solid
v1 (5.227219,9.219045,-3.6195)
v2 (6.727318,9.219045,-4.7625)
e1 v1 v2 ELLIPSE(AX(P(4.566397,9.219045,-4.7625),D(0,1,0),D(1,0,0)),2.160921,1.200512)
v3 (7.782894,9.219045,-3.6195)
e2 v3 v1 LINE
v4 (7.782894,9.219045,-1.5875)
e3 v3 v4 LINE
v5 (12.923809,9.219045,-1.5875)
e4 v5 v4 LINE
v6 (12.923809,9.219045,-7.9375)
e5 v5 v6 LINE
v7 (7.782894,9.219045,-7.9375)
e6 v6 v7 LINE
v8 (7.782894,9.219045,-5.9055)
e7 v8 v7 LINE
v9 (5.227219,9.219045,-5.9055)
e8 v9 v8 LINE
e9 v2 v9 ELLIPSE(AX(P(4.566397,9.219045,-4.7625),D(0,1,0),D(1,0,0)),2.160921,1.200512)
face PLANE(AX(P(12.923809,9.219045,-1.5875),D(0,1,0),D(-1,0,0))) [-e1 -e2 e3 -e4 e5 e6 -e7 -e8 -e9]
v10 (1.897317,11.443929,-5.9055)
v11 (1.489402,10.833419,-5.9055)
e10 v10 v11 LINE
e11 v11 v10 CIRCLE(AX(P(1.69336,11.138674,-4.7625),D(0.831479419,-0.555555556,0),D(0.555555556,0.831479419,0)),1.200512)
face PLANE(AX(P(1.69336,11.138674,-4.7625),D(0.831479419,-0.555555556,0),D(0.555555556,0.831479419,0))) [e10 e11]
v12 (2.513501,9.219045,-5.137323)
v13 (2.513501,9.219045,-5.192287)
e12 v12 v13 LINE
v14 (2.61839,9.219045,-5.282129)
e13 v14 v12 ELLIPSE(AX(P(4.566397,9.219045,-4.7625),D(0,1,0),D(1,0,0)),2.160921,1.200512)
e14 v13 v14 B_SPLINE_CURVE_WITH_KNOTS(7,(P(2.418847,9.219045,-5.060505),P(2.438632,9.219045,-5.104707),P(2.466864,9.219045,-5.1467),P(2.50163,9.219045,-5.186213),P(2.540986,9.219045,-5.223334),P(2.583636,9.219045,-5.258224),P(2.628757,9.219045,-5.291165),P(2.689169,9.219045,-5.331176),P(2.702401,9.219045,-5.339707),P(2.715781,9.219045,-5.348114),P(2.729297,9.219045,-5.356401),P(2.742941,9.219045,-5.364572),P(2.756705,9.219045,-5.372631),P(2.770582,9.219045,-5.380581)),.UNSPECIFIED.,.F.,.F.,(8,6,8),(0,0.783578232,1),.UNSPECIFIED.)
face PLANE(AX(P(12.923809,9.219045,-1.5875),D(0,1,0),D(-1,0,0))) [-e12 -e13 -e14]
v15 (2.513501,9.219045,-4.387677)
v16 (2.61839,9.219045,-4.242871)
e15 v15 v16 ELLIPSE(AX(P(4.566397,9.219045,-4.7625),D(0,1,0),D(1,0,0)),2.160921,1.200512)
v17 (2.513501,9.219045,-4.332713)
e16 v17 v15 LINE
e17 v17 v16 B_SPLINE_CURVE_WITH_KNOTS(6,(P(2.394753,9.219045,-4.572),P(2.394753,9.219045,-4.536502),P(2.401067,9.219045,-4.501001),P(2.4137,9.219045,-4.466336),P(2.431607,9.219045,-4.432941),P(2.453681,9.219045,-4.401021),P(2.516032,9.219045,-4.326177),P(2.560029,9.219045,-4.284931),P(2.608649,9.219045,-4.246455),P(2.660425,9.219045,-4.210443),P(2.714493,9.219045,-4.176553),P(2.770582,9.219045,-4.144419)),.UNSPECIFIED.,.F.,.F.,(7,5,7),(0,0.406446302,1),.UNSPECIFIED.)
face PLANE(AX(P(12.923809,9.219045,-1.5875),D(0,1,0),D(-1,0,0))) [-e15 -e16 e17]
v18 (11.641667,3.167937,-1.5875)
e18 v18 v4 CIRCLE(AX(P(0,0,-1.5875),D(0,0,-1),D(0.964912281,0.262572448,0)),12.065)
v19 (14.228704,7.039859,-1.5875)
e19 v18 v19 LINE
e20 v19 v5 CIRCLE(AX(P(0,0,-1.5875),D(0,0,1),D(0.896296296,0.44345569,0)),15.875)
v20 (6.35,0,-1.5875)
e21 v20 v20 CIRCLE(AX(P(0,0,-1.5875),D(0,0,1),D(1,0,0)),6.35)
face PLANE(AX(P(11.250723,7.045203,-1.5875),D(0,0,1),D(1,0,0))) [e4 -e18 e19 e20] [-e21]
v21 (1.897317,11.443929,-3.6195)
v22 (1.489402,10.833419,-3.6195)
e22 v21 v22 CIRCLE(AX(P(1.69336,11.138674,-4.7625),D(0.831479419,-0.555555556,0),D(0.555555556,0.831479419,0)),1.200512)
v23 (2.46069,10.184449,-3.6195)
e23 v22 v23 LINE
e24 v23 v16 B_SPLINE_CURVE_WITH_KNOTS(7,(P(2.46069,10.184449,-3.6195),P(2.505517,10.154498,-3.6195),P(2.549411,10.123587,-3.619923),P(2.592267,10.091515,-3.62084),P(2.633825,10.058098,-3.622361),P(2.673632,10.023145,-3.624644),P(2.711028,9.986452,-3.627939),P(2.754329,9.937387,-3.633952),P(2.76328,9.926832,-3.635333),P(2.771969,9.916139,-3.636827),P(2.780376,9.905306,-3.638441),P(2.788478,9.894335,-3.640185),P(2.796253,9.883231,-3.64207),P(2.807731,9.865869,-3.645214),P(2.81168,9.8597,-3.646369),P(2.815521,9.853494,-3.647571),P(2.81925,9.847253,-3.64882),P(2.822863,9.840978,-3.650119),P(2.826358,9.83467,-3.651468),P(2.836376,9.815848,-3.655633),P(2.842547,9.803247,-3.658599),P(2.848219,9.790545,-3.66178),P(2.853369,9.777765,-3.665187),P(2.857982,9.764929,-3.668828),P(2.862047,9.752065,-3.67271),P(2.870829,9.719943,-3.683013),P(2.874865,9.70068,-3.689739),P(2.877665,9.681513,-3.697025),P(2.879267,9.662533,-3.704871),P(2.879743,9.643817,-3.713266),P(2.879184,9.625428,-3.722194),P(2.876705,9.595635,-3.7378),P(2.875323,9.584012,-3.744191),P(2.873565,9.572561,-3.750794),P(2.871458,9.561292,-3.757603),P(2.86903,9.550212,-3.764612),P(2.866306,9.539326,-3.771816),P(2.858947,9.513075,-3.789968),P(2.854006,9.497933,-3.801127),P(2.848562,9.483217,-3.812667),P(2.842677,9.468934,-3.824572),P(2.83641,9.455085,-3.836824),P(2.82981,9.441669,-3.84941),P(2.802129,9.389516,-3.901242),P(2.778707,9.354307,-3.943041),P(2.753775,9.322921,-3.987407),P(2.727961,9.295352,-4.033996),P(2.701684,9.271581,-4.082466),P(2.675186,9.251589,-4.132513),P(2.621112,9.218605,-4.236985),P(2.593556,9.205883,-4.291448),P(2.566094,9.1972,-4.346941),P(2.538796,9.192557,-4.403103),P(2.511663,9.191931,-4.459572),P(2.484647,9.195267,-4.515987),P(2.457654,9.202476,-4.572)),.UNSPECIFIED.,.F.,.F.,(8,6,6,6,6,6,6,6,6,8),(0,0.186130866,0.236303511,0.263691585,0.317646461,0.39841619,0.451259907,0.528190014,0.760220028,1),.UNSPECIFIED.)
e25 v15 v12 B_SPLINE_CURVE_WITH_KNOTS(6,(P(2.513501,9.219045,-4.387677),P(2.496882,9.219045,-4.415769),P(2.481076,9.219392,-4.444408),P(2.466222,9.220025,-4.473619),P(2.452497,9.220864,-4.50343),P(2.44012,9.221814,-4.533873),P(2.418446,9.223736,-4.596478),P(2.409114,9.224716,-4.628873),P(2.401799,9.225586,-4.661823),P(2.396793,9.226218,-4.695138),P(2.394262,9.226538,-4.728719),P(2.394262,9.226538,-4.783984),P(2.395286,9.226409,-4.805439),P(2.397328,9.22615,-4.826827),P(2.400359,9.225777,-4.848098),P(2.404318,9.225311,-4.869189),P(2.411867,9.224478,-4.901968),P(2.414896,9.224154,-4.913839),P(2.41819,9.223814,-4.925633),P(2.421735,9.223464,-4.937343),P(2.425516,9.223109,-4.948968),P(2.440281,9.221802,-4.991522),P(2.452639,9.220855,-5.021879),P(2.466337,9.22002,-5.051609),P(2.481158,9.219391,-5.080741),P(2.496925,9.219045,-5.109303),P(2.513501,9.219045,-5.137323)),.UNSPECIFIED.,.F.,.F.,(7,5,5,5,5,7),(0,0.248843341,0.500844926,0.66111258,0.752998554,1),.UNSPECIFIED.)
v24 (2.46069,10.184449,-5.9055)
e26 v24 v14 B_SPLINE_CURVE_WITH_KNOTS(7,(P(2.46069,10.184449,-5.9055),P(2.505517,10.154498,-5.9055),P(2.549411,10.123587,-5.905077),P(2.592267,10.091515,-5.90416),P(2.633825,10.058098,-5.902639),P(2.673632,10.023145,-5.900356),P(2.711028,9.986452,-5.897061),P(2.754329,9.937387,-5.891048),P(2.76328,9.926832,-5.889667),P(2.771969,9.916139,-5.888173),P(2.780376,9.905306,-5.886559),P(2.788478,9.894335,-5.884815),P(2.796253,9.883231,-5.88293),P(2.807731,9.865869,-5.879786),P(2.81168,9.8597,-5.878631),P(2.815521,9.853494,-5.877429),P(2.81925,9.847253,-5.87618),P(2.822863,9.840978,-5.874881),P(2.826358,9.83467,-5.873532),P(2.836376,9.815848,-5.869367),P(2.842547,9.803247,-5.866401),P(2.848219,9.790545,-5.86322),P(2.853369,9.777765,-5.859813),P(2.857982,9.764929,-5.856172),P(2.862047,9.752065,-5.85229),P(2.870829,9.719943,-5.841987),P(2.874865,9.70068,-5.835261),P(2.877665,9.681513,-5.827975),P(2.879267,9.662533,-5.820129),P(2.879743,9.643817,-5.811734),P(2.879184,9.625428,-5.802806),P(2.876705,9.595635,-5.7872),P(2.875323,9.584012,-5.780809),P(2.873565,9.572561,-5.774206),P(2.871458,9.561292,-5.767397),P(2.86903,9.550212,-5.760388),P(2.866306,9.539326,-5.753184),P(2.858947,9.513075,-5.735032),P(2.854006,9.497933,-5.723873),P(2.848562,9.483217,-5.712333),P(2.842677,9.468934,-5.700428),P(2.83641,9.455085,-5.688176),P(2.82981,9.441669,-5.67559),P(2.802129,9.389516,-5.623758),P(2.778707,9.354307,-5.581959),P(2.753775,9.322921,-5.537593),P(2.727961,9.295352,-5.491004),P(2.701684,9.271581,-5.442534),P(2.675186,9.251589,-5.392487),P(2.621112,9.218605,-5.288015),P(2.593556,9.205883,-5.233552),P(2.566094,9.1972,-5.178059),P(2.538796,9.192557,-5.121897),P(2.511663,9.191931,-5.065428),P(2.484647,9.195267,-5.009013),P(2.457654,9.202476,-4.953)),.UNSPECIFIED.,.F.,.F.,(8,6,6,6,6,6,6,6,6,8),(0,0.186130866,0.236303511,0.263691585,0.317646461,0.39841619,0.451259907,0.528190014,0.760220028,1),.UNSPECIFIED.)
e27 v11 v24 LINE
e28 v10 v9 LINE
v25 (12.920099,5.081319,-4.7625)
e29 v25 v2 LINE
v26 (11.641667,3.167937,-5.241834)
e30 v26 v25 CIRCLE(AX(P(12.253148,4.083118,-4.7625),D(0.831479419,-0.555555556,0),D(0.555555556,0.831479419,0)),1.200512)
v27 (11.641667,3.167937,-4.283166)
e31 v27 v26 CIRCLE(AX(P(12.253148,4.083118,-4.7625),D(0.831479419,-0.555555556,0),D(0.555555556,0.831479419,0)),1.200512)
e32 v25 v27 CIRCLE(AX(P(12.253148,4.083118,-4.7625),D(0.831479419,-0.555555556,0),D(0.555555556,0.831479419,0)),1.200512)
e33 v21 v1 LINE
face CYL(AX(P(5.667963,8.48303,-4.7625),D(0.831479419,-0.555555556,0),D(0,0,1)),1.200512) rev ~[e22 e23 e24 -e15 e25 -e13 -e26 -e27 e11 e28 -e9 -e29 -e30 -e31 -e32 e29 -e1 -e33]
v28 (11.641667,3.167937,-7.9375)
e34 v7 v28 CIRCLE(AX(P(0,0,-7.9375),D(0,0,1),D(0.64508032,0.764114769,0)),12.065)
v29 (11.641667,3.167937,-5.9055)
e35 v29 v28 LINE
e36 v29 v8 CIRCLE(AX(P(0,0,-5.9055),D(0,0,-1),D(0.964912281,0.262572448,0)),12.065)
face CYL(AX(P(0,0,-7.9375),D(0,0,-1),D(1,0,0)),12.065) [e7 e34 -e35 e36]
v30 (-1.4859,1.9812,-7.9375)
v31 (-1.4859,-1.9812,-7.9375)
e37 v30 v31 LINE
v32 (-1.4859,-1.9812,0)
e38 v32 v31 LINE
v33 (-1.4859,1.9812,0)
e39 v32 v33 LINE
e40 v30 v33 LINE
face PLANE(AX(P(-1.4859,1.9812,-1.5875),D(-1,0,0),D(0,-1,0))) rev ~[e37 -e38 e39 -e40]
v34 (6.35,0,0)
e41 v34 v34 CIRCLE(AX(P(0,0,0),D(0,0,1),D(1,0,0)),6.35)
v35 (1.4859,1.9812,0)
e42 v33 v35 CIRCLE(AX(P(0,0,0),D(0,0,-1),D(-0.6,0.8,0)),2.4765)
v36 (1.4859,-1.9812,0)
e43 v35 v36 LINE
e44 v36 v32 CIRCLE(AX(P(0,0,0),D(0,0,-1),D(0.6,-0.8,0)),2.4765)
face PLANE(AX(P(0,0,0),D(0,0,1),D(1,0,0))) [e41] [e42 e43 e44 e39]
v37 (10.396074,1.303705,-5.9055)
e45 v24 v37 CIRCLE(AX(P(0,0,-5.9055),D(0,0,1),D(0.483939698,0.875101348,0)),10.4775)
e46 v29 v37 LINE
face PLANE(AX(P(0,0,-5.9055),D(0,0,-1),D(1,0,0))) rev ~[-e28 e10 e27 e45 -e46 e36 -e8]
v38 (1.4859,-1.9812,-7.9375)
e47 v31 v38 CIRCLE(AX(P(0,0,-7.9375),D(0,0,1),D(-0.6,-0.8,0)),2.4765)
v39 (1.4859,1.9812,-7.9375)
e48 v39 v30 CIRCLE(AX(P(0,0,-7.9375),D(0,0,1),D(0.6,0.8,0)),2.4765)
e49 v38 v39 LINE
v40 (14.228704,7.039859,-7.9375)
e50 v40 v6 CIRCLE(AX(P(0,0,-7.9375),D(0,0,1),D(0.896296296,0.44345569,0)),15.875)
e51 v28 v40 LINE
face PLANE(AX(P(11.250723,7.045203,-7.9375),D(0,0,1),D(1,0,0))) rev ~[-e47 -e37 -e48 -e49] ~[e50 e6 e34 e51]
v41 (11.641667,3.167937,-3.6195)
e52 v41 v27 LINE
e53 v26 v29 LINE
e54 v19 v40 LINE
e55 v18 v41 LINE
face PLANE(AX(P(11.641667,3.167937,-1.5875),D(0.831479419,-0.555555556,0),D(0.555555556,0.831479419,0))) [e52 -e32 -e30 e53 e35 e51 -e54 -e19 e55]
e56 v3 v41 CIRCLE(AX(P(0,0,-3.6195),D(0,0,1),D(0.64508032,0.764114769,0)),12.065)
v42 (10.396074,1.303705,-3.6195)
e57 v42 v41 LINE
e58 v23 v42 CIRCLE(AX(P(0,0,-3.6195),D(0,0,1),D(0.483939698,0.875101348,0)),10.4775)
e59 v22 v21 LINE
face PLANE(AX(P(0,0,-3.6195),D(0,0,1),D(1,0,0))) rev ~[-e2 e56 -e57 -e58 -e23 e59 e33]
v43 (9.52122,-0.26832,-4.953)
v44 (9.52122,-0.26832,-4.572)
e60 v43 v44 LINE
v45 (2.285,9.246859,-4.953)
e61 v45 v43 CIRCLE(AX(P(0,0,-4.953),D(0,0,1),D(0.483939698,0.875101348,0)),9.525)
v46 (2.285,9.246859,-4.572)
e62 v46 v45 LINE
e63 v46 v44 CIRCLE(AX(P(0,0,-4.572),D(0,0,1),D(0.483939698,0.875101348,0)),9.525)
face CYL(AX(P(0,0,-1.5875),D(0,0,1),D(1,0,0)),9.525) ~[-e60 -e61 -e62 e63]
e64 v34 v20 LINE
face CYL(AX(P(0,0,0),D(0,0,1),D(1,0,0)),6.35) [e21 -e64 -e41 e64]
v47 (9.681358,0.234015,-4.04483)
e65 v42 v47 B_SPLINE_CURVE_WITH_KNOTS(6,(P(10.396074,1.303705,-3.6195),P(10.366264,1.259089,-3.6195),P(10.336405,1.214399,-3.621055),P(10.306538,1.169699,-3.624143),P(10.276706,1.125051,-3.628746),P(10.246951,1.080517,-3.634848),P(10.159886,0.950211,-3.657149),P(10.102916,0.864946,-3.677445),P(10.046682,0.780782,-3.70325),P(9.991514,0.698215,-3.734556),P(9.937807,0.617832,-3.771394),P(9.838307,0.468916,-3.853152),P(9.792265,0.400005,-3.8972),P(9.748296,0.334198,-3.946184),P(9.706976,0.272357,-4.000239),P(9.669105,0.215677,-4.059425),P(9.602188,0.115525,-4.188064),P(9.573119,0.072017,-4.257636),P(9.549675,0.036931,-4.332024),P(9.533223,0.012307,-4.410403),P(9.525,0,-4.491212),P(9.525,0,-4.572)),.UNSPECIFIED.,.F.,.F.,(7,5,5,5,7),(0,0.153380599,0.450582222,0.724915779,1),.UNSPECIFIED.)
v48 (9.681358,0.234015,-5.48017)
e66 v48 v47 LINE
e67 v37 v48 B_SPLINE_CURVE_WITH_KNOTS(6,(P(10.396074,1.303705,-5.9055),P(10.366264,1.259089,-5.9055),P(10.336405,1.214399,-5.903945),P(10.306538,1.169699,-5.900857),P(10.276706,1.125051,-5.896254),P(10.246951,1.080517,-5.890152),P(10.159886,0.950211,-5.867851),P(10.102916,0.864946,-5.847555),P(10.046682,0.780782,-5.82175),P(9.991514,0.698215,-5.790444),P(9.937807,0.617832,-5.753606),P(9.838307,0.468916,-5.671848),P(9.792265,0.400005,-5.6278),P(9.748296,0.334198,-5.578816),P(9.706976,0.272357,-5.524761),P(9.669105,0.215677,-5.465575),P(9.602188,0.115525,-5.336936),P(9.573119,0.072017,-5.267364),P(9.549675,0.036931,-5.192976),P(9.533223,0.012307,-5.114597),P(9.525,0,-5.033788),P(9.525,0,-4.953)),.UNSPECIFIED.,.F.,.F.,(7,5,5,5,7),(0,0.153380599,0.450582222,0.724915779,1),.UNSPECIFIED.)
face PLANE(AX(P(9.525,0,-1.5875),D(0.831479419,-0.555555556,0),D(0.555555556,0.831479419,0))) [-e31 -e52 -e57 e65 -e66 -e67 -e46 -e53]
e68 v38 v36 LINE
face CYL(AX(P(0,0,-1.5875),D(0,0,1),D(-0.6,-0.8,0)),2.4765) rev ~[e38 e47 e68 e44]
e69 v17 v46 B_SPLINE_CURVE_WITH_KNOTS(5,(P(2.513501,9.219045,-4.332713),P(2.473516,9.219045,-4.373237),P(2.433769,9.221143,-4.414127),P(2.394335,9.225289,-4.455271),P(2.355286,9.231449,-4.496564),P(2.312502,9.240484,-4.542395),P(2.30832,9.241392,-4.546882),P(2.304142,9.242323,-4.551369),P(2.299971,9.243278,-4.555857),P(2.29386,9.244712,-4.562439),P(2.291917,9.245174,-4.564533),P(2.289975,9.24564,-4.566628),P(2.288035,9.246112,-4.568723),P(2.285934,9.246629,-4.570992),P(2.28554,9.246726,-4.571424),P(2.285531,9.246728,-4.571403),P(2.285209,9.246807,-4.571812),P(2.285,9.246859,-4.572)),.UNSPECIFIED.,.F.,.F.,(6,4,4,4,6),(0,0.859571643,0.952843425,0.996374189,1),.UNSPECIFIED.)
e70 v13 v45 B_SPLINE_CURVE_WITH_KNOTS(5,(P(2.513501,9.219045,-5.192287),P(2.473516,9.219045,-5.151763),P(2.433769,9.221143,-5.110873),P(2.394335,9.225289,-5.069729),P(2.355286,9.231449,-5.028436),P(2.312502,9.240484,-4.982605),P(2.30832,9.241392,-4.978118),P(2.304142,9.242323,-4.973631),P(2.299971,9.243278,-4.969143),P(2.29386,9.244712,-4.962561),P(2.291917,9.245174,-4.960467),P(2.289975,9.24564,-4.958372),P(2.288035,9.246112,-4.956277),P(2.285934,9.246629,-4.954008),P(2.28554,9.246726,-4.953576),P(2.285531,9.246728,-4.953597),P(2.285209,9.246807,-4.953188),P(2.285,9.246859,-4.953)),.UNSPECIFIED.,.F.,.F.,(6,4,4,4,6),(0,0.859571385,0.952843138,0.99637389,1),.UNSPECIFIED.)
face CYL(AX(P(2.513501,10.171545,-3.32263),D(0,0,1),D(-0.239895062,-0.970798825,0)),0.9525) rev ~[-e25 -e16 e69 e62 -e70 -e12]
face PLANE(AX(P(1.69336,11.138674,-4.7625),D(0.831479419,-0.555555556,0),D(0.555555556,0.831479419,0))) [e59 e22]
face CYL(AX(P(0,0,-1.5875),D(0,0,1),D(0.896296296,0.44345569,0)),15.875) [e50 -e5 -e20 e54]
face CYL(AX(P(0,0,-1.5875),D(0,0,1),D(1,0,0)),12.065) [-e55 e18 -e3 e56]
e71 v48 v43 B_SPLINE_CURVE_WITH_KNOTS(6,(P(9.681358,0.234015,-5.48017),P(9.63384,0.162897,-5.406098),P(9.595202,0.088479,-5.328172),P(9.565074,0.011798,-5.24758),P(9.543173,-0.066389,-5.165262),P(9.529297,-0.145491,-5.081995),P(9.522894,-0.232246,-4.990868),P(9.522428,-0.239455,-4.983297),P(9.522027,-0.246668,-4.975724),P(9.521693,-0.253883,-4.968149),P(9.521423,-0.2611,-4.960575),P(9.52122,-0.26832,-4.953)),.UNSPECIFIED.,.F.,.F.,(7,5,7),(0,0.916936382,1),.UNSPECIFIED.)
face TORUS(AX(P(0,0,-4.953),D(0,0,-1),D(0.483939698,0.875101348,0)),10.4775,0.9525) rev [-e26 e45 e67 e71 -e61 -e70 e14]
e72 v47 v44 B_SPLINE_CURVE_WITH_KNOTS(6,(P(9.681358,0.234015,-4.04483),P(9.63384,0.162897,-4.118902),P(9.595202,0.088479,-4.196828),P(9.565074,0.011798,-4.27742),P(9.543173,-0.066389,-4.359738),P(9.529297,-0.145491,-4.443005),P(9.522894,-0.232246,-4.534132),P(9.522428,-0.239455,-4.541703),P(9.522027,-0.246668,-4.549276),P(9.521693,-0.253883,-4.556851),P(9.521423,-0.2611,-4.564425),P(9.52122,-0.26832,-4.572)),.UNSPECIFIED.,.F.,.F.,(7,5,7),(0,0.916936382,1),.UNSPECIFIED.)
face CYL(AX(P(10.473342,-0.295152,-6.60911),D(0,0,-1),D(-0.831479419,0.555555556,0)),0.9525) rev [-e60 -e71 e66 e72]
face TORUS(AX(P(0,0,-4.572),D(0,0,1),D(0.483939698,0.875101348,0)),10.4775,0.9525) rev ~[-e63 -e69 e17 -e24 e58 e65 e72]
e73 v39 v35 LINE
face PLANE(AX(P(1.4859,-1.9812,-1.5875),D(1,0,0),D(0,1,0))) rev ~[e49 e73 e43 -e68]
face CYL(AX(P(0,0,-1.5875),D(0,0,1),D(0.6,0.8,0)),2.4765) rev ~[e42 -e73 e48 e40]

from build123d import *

# Parameters (mm, degrees)
F0_R          = 6.35
F1_DEPTH      = 1.5875
F2_R          = 9.525
F2_R_2        = 6.35
F3_DEPTH      = 6.35
F4_R          = 12.065
F4_R_2        = 9.525
F5_DEPTH      = 2.032
F6_R          = 12.065
F6_R_2        = 6.35
F7_DEPTH      = 2.032
F9_DEPTH      = 6.35
F10_R         = 1.2005117183
F11_DEPTH     = 12.7
F12_T1_DEPTH  = 3.6932202738
F12_T6_ANGLE  = 313.32464119
F12_S7_R      = 1.2005117183
F12_T8_DEPTH  = 18
F12_T12_DEPTH = 2.8797396175
F12_S13_R     = 1.2005117183
F12_T14_DEPTH = 3
F12_T18_ANGLE = 313.32464119
F12_S19_R     = 1.2005117183
F12_T20_DEPTH = 18


# Not quite as in the source:
# - a fillet or chamfer that OpenCascade refuses, or shapes differently, is made with other operations: its cross-section is extruded or revolved along the edge and cut away or added


with BuildPart() as f1:
    # F0 (on Top) → F1 (new body)
    with BuildSketch(Plane.XY):
        Circle(F0_R)
        with BuildLine():
            ThreePointArc((1.4859, -1.9812), (0, -2.4765), (-1.4859, -1.9812))
            Line((-1.4859, -1.9812), (-1.4859, 1.9812))
            ThreePointArc((-1.4859, 1.9812), (0, 2.4765), (1.4859, 1.9812))
            Line((1.4859, 1.9812), (1.4859, -1.9812))
        make_face(mode=Mode.SUBTRACT)
    extrude(amount=-F1_DEPTH)

    # F2 (on face) → F3 (join)
    with BuildSketch(Plane(origin=(0, 0, -1.5875), x_dir=(1, 0, 0), z_dir=(0, 0, -1))):
        Circle(F2_R)
        Circle(F2_R_2, mode=Mode.SUBTRACT)
        Circle(F2_R_2)
        with BuildLine():
            ThreePointArc((-1.4859, 1.9812), (0, 2.4765), (1.4859, 1.9812))
            Line((1.4859, 1.9812), (1.4859, -1.9812))
            ThreePointArc((1.4859, -1.9812), (0, -2.4765), (-1.4859, -1.9812))
            Line((-1.4859, -1.9812), (-1.4859, 1.9812))
        make_face(mode=Mode.SUBTRACT)
    extrude(amount=F3_DEPTH)

    # F4 (on face) → F5 (join)
    with BuildSketch(Plane.XY.offset(-1.5875)):
        Circle(F4_R)
        Circle(F4_R_2, mode=Mode.SUBTRACT)
    extrude(amount=-F5_DEPTH)

    # F6 (on face) → F7 (join)
    with BuildSketch(Plane(origin=(0, 0, -7.9375), x_dir=(1, 0, 0), z_dir=(0, 0, -1))):
        Circle(F6_R)
        Circle(F6_R_2, mode=Mode.SUBTRACT)
    extrude(amount=-F7_DEPTH)

    # F8 (on face) → F9 (join)
    with BuildSketch(Plane.XY.offset(-1.5875)):
        with BuildLine():
            ThreePointArc((7.7828940639, 9.2190446897), (10.1726283334, 6.4870530898), (11.6416666667, 3.1679365875))
            Line((11.6416666667, 3.1679365875), (14.2287037037, 7.0398590833))
            ThreePointArc((14.2287037037, 7.0398590833), (13.6199100402, 8.1555916706), (12.9238090364, 9.2190446897))
            Line((12.9238090364, 9.2190446897), (7.7828940639, 9.2190446897))
        make_face()
        with BuildLine():
            ThreePointArc((2.3947525988, 9.2190446897), (7.534442365, 5.8273324299), (9.525, 0))
            Line((9.525, 0), (11.6416666667, 3.1679365875))
            ThreePointArc((11.6416666667, 3.1679365875), (10.1726283334, 6.4870530898), (7.7828940639, 9.2190446897))
            Line((7.7828940639, 9.2190446897), (2.3947525988, 9.2190446897))
        make_face()
    extrude(amount=-F9_DEPTH)

    # F10 (on face) → F11 (cut)
    with BuildSketch(Plane(origin=(6.5851851852, -4.399911927, 0), x_dir=(0.5555555556, 0.8314794193, 0), z_dir=(0.8314794193, -0.5555555556, 0))):
        with Locations((10.2023333333, -4.7625)):
            Circle(F10_R)
    extrude(amount=-F11_DEPTH, mode=Mode.SUBTRACT)

    # F12: fillet of radius 0.9525 on 4 edges, made by hand

    # F12_s2 → F12_t1 (join)
    with BuildSketch(Plane.XY.offset(-6.6091101369)):
        with BuildLine():
            ThreePointArc((9.6813578082, 0.2340149392), (9.5658390102, -0.0058514421), (9.5212199592, -0.2683197522))
            ThreePointArc((9.5212199592, -0.2683197522), (9.5240549429, -0.1341731886), (9.525, 0))
            Line((9.525, 0), (9.6813578082, 0.2340149392))
        make_face()
    extrude(amount=F12_T1_DEPTH)


with BuildPart() as f12_tool4:
    # F12_s5 → F12_t6 (revolve)
    with BuildSketch(Plane(origin=(0, 0, 0), x_dir=(0, 0, 1), z_dir=(0.8751013478, -0.4839396977, 0))):
        with BuildLine():
            ThreePointArc((-3.6195, -10.4775), (-3.8984807909, -9.8039807909), (-4.572, -9.525))
            Line((-4.572, -9.525), (-3.6195, -9.525))
            Line((-3.6195, -9.525), (-3.6195, -10.4775))
        make_face()
    revolve(axis=Axis((0, 0, -3.6195), (0, 0, 1)), revolution_arc=F12_T6_ANGLE)

    # F12_s7 → F12_t8 (cut, symmetric)
    with BuildSketch(Plane(origin=(0, 0, 0), x_dir=(0, 0, 1), z_dir=(0.8314794193, -0.5555555556, 0))):
        with Locations((-4.7625, -10.2023333333)):
            Circle(F12_S7_R)
    extrude(amount=F12_T8_DEPTH, both=True, mode=Mode.SUBTRACT)


with BuildPart() as f1_1:
    add(f1.part)

    # F12_t3: union F12_tool4
    add(f12_tool4.part)


with BuildPart() as f12_tool10:
    # F12_s11 → F12_t12 (new body)
    with BuildSketch(Plane.XY.offset(-3.3226301913)):
        with BuildLine():
            ThreePointArc((2.2850004748, 9.2468588088), (2.398407194, 9.2260237879), (2.5135005223, 9.2190446897))
            Line((2.5135005223, 9.2190446897), (2.3947525988, 9.2190446897))
            ThreePointArc((2.3947525988, 9.2190446897), (2.3399178648, 9.2331148258), (2.2850004748, 9.2468588088))
        make_face()
    extrude(amount=-F12_T12_DEPTH)

    # F12_s13 → F12_t14 (cut, symmetric)
    with BuildSketch(Plane(origin=(-2.5775861998, 1.7222222222, 0), x_dir=(0, 0, 1), z_dir=(0.8314794193, -0.5555555556, 0))):
        with Locations((-4.7625, -10.2023333333)):
            Circle(F12_S13_R)
    extrude(amount=F12_T14_DEPTH, both=True, mode=Mode.SUBTRACT)


with BuildPart() as f1_2:
    add(f1_1.part)

    # F12_t9: union F12_tool10
    add(f12_tool10.part)


with BuildPart() as f12_tool16:
    # F12_s17 → F12_t18 (revolve)
    with BuildSketch(Plane(origin=(0, 0, 0), x_dir=(0, 0, 1), z_dir=(0.8751013478, -0.4839396977, 0))):
        with BuildLine():
            ThreePointArc((-5.9055, -10.4775), (-5.6265192091, -9.8039807909), (-4.953, -9.525))
            Line((-4.953, -9.525), (-5.9055, -9.525))
            Line((-5.9055, -9.525), (-5.9055, -10.4775))
        make_face()
    revolve(axis=Axis((0, 0, -5.9055), (0, 0, 1)), revolution_arc=F12_T18_ANGLE)

    # F12_s19 → F12_t20 (cut, symmetric)
    with BuildSketch(Plane(origin=(0, 0, 0), x_dir=(0, 0, 1), z_dir=(0.8314794193, -0.5555555556, 0))):
        with Locations((-4.7625, -10.2023333333)):
            Circle(F12_S19_R)
    extrude(amount=F12_T20_DEPTH, both=True, mode=Mode.SUBTRACT)


with BuildPart() as f1_3:
    add(f1_2.part)

    # F12_t15: union F12_tool16
    add(f12_tool16.part)


solid = f1_3.part
